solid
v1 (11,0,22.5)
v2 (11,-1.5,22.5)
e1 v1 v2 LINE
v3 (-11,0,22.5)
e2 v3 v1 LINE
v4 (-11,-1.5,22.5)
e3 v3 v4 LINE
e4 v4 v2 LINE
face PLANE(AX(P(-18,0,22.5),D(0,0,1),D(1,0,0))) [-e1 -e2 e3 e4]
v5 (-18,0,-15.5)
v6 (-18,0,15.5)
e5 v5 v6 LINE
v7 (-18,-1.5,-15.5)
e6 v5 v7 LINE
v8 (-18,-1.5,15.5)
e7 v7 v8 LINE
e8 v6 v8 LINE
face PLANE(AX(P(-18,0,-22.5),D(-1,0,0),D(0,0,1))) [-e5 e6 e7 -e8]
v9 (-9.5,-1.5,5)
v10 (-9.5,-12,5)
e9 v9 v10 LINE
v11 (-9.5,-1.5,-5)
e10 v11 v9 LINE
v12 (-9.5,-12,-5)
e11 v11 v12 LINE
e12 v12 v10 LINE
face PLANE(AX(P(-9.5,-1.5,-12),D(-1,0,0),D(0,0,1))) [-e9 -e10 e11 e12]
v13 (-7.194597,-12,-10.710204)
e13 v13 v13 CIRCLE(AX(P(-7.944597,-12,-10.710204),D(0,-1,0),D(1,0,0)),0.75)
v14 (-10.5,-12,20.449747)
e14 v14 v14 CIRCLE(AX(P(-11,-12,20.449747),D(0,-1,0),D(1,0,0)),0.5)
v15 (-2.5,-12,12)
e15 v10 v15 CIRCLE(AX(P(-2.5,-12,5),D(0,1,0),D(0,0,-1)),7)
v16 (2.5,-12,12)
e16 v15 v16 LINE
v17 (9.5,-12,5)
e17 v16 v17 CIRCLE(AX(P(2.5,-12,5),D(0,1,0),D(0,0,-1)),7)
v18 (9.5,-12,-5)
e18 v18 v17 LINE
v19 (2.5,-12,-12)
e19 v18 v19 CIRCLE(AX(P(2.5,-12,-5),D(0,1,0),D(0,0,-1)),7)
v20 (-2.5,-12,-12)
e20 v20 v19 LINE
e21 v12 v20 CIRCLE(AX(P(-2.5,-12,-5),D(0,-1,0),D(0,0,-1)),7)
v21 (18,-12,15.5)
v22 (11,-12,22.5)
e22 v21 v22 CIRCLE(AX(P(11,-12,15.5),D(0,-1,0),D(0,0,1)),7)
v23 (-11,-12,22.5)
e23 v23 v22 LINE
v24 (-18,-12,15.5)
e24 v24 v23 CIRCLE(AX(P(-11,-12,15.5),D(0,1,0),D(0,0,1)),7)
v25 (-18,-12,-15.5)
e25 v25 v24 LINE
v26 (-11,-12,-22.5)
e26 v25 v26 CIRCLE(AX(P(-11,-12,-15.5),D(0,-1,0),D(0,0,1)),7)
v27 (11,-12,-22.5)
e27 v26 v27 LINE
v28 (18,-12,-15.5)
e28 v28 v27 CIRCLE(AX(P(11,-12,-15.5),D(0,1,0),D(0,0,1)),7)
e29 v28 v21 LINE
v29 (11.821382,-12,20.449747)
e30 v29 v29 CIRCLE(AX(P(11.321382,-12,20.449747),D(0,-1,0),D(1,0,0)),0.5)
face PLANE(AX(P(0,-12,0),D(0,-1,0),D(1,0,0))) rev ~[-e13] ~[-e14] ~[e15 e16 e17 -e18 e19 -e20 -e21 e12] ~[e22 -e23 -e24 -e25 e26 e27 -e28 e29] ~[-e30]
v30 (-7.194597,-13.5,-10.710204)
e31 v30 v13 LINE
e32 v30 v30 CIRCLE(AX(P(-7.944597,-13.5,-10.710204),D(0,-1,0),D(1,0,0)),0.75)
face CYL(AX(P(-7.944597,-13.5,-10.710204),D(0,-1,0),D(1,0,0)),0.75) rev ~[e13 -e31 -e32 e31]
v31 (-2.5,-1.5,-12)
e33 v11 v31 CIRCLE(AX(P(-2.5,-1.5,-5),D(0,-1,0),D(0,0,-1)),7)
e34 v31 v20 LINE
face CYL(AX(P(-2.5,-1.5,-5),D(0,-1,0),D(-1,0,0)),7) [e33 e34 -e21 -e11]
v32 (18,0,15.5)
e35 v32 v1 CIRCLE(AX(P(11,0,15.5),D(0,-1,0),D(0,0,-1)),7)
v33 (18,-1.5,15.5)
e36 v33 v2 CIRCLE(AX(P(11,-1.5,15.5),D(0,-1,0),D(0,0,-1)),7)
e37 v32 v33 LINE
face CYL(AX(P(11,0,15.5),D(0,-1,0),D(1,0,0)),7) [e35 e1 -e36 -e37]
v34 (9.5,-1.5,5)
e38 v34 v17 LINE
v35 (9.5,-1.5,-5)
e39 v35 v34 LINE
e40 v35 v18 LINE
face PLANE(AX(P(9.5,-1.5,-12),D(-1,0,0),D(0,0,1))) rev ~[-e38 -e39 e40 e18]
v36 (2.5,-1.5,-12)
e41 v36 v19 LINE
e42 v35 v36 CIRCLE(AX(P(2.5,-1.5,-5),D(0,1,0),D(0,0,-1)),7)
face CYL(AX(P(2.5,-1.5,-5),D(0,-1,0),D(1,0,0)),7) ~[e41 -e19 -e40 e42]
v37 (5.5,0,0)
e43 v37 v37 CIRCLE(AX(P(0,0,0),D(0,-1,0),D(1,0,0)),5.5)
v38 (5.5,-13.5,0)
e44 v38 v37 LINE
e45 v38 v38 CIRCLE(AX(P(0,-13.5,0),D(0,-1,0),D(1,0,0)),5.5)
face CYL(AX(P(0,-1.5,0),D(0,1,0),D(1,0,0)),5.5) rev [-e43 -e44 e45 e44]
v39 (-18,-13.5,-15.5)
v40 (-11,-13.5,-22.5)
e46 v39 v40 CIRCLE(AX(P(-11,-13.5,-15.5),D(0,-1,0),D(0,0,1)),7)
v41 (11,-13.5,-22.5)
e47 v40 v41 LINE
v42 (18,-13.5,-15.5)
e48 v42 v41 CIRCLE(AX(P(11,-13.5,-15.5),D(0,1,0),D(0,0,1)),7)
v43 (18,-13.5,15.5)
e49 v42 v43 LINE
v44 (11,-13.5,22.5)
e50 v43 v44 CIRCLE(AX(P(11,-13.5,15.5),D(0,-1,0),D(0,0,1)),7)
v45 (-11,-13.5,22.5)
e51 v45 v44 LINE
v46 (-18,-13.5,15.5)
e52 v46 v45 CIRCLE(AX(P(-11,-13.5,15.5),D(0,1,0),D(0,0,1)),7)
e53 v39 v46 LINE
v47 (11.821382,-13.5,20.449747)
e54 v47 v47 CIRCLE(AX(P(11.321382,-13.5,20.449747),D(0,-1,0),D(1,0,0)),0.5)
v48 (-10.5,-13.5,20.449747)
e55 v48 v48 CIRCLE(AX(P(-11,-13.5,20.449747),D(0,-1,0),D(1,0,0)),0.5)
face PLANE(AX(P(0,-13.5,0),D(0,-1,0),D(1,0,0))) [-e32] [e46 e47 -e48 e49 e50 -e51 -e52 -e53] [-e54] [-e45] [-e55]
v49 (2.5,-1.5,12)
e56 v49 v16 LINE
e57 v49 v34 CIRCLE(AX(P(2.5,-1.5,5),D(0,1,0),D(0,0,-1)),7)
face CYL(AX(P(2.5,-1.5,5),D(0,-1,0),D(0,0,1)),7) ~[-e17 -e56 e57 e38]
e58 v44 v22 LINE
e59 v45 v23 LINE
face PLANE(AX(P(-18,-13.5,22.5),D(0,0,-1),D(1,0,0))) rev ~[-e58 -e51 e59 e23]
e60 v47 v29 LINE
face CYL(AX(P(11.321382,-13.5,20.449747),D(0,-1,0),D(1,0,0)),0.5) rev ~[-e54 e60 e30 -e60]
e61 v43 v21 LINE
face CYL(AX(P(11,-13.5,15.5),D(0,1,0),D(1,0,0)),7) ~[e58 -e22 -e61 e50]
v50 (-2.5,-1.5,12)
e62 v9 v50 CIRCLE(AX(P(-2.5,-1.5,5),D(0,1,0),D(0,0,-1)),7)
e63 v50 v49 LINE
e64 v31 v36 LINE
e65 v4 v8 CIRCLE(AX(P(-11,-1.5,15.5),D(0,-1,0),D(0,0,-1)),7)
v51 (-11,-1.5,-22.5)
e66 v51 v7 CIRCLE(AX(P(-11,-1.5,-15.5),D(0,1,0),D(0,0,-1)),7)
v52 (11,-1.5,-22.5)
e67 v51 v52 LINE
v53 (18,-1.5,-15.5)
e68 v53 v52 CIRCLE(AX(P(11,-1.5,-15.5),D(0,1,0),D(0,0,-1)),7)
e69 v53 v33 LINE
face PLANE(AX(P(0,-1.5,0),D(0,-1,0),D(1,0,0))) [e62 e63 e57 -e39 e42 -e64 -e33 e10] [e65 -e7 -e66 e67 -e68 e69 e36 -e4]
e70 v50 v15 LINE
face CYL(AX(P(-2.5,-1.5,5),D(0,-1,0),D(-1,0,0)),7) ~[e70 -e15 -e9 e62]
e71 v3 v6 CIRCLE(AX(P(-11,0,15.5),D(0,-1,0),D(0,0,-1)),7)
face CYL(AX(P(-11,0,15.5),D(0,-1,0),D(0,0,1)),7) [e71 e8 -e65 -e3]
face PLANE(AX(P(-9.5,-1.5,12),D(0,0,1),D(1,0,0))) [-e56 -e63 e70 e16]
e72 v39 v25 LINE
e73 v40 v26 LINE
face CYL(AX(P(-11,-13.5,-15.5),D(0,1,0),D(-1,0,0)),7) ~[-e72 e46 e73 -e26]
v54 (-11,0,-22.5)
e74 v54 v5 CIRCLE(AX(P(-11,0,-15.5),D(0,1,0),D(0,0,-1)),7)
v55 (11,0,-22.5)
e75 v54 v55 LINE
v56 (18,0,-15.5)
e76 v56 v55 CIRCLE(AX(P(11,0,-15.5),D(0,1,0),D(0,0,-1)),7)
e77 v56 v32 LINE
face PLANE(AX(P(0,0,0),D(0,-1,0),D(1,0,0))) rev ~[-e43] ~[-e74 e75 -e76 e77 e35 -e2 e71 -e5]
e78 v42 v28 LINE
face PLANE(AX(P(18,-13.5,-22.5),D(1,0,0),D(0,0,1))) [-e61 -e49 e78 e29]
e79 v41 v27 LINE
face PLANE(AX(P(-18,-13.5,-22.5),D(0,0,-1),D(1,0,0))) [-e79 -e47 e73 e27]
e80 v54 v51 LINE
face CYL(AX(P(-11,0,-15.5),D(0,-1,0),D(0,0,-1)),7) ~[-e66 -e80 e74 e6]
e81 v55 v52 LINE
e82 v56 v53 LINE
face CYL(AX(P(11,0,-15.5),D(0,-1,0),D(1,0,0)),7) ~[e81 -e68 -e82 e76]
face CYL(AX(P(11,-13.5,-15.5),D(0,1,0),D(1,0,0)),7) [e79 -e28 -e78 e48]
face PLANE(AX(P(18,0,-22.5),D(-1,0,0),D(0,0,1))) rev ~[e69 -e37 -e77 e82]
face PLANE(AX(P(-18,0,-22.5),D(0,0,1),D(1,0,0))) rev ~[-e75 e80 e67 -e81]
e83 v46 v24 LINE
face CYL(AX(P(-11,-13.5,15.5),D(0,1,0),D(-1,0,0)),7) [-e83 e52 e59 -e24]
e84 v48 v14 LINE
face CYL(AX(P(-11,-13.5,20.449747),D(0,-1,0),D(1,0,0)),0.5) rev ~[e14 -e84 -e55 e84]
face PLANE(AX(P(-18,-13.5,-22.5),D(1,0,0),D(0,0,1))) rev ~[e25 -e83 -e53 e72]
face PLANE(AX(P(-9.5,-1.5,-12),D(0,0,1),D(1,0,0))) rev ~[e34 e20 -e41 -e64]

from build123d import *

# Parameters (mm, degrees)
F0_W      = 36
F0_H      = 45
F0_R      = 5.5
F1_DEPTH  = 1.5
F2_W      = 19
F2_H      = 24
F2_R      = 5.5
F3_DEPTH  = 12
F4_W      = 36
F4_H      = 45
F4_W_2    = 19
F4_H_2    = 24
F4_R      = 5.5
F5_DEPTH  = 1.5
F6_R      = 7
F7_R      = 0.75
F8_DEPTH  = 2.5
F9_R      = 0.5
F10_DEPTH = 2.5


# Not quite as in the source:
# - a feature names something its author has since deleted; it is built from what else it names


with BuildPart() as f1:
    # F0 (on Front) → F1 (new body)
    with BuildSketch(Plane.XZ):
        Rectangle(F0_W, F0_H)
        Circle(F0_R, mode=Mode.SUBTRACT)
    extrude(amount=F1_DEPTH)

    # F2 (on face) → F3 (join)
    with BuildSketch(Plane.XZ.offset(1.5)):
        Rectangle(F2_W, F2_H)
        Circle(F2_R, mode=Mode.SUBTRACT)
    extrude(amount=F3_DEPTH)

    # F4 (on face) → F5 (join)
    with BuildSketch(Plane.XZ.offset(13.5)):
        Rectangle(F4_W, F4_H)
        Rectangle(F4_W_2, F4_H_2, mode=Mode.SUBTRACT)
        Rectangle(F4_W_2, F4_H_2)
        Circle(F4_R, mode=Mode.SUBTRACT)
    extrude(amount=-F5_DEPTH)

    # F6
    f6_edges = [f1.edges().sort_by_distance(p)[0] for p in [
        (9.5, -6.75, 12),
        (9.5, -6.75, -12),
        (18, -0.75, 22.5),
        (18, -12.75, 22.5),
        (18, -12.75, -22.5),
        (18, -0.75, -22.5),
        (-18, -0.75, -22.5),
        (-18, -12.75, -22.5),
        (-9.5, -6.75, -12),
        (-9.5, -6.75, 12),
        (-18, -0.75, 22.5),
        (-18, -12.75, 22.5),
    ]]
    fillet(f6_edges, radius=F6_R)

    # F7 (on face) → F8 (cut)
    with BuildSketch(Plane.XZ.offset(13.5)):
        with Locations((-7.9445969313, -10.7102040201)):
            Circle(F7_R)
    extrude(amount=-F8_DEPTH, mode=Mode.SUBTRACT)

    # F9 (on face) → F10 (cut)
    with BuildSketch(Plane.XZ.offset(13.5)):
        with Locations((-11, 20.4497474683)):
            Circle(F9_R)
        with Locations((11.3213816658, 20.4497474683)):
            Circle(F9_R)
    extrude(amount=-F10_DEPTH, mode=Mode.SUBTRACT)


solid = f1.part
